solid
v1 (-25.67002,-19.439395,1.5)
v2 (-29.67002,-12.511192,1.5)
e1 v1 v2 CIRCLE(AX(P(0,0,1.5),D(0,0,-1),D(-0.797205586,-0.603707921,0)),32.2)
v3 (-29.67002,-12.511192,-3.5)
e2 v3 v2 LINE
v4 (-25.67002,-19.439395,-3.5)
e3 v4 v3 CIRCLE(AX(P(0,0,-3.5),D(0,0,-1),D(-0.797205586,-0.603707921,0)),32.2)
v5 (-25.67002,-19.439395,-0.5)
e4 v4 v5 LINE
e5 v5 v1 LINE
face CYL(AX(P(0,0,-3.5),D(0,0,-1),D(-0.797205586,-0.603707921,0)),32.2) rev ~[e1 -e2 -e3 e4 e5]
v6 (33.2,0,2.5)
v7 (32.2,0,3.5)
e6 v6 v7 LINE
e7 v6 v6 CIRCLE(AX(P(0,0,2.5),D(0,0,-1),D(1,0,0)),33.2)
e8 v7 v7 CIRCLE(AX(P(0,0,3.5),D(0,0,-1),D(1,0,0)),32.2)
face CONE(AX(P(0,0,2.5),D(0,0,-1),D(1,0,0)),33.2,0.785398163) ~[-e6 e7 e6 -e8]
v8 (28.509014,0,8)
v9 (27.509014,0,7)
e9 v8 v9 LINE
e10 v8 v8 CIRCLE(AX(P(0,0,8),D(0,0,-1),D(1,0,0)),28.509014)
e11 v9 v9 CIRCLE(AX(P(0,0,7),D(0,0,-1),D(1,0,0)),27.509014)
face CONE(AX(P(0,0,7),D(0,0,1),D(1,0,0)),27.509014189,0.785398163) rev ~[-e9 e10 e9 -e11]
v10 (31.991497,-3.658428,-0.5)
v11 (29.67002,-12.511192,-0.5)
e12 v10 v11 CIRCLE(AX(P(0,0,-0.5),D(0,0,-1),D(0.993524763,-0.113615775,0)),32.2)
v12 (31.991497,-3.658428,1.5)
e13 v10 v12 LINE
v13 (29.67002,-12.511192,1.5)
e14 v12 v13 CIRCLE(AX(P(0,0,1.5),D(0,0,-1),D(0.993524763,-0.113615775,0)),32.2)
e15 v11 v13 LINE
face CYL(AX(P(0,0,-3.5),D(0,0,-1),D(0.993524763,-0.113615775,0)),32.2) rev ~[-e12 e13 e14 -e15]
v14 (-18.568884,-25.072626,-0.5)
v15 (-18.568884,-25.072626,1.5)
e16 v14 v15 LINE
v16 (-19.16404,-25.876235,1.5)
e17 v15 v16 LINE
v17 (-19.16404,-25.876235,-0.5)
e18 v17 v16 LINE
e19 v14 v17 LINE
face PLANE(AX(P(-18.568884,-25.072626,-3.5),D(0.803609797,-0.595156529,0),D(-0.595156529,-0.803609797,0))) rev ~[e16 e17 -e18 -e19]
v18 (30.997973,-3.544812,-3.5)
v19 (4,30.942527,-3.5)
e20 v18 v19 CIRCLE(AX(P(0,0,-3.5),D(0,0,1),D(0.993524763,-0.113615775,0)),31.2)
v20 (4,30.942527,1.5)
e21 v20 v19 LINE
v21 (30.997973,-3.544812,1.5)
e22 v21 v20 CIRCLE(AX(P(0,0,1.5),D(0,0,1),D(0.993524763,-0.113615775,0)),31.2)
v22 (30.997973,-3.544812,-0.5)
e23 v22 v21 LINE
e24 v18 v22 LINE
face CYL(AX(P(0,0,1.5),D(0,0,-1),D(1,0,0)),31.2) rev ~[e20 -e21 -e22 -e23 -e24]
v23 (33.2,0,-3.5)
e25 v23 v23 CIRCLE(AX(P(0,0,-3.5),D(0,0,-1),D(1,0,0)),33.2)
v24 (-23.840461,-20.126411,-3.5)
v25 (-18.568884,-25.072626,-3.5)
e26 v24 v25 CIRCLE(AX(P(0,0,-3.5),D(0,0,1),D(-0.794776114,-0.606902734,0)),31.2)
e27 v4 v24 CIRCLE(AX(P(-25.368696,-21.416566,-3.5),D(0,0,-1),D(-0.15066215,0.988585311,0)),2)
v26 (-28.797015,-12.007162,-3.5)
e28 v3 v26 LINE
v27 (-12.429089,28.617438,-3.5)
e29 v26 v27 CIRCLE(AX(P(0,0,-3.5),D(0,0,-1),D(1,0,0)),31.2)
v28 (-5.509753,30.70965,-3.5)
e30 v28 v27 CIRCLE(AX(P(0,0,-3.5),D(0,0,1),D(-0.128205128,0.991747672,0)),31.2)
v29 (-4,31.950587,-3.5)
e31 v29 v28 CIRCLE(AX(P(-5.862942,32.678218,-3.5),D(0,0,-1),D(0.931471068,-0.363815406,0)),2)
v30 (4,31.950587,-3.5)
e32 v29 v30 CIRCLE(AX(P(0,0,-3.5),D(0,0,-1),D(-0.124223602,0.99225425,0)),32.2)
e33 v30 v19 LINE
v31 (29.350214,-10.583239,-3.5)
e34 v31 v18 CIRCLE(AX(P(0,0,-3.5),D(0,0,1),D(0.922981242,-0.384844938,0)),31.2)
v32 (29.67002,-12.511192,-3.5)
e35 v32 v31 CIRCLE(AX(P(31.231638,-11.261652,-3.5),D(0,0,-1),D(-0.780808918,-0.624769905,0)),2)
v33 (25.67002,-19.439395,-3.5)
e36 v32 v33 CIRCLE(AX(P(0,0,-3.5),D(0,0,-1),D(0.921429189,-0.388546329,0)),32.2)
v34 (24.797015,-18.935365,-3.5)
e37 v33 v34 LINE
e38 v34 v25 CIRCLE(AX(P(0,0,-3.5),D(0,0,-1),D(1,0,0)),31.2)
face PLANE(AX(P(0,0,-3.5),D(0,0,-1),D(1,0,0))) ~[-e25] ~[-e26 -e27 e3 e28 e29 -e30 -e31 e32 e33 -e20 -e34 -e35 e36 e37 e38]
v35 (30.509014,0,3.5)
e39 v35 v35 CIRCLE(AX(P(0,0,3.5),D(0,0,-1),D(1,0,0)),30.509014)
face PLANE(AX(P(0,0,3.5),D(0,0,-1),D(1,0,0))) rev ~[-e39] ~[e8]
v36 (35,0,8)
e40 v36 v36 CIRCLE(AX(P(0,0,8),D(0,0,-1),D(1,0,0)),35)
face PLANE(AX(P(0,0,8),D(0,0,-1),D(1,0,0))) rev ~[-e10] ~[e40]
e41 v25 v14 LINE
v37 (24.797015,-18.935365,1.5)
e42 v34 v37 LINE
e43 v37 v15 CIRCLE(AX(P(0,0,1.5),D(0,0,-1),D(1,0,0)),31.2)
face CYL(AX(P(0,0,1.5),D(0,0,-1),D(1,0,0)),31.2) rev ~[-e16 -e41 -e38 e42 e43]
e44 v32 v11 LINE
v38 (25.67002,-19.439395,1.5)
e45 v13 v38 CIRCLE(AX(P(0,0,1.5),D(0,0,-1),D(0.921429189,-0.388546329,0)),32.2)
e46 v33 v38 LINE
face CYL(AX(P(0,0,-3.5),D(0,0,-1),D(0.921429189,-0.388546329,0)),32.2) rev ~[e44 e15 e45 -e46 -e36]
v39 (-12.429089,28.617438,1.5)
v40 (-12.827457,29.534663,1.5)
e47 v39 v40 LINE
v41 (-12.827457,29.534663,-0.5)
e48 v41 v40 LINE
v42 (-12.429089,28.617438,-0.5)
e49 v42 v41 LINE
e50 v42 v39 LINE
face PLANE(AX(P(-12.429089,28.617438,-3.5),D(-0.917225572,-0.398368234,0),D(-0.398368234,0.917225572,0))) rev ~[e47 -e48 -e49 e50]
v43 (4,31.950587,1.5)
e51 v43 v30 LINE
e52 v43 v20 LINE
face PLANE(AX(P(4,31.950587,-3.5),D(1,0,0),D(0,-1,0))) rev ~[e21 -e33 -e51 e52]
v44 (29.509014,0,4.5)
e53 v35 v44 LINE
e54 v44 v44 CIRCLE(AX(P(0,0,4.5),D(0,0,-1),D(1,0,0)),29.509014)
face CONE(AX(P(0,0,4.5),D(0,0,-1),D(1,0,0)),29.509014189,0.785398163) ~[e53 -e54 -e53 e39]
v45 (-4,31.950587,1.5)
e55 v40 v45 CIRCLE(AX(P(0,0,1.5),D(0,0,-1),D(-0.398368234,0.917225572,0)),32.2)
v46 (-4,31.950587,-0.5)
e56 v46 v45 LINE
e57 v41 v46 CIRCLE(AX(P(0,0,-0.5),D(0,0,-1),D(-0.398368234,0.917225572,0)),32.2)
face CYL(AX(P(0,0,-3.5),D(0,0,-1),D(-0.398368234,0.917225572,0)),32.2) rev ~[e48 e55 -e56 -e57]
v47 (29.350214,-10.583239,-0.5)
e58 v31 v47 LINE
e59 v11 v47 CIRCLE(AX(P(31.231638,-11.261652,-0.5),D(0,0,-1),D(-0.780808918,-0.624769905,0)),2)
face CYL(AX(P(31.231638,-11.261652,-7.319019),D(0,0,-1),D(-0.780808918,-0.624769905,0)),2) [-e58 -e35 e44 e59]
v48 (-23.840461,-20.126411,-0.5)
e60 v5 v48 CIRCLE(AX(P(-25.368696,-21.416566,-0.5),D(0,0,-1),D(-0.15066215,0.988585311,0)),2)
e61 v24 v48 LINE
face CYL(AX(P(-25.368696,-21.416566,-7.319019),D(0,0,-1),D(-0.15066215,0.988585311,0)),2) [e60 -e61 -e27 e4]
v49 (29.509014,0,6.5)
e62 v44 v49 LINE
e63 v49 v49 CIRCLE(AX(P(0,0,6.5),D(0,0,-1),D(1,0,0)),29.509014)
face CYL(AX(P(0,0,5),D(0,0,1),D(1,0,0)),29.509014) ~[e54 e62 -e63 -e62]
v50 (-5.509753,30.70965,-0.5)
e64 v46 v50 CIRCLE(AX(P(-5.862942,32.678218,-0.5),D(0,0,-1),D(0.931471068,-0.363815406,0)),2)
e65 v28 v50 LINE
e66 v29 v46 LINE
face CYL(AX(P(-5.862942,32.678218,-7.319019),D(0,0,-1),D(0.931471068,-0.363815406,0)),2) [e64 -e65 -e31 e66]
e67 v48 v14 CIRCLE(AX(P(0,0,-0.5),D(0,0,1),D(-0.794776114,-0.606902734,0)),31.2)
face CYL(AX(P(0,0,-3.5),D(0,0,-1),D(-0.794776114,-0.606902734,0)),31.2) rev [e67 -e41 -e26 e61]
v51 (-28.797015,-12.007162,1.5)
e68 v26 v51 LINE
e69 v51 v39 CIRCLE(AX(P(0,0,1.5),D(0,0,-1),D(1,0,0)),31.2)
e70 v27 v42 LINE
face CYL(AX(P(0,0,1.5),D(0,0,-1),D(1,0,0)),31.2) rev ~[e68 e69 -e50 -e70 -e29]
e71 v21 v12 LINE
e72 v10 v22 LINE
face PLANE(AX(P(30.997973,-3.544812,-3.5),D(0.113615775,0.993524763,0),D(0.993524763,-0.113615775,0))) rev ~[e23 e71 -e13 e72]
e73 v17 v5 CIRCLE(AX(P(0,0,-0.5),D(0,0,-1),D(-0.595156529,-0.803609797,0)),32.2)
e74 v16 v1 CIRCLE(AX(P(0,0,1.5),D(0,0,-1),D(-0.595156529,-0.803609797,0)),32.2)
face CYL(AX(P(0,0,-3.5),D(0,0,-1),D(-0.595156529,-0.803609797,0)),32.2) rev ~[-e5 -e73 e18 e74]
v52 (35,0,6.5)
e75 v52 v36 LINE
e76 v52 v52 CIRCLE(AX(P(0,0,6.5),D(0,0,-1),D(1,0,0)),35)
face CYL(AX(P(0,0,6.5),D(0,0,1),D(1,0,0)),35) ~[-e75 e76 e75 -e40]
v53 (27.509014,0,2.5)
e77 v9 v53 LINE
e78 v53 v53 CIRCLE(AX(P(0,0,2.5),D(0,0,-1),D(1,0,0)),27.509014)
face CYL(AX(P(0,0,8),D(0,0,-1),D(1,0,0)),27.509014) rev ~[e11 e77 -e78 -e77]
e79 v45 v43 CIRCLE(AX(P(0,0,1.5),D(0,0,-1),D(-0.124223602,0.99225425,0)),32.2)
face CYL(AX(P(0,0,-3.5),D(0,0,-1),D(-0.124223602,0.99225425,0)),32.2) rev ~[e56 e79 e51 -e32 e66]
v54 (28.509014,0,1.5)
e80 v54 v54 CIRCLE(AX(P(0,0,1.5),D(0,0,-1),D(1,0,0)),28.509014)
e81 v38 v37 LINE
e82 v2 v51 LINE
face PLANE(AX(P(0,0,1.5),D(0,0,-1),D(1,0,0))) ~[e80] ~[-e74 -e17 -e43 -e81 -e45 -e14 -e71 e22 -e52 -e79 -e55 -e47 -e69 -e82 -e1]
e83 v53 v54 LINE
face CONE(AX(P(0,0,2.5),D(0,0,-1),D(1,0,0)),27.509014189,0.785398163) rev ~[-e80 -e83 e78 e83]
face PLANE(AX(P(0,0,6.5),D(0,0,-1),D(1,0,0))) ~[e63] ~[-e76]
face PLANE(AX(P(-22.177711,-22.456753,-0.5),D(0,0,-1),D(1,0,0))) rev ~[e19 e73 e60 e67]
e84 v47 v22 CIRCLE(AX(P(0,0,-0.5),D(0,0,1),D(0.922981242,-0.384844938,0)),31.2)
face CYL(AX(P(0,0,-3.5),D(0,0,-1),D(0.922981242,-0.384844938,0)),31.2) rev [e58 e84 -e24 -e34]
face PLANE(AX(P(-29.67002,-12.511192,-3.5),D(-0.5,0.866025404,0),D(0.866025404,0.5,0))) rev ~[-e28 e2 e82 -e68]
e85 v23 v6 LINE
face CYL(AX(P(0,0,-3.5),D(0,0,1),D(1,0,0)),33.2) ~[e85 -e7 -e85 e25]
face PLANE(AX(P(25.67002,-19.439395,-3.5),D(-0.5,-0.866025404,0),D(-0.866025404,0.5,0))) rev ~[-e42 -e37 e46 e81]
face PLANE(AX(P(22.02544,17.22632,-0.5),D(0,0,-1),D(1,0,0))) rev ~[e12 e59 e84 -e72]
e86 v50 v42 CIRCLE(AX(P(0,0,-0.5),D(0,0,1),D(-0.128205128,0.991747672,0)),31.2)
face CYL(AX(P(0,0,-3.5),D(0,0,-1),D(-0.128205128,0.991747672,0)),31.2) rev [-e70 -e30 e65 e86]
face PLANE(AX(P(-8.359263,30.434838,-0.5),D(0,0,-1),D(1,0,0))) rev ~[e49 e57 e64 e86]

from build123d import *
from build123d import SkipClean  # not in build123d's __all__

# Parameters (mm, degrees)
F0_W        = 2
F0_H        = 2
F0_H_2      = 3
F2_SIZE     = 1
F4_DEPTH    = 5
F5_DEPTH    = 3
F6_T4_DEPTH = 10.6380386618
F6_T6_DEPTH = 6.8190193309
F6_T8_DEPTH = 6.8190193309


# Not quite as in the source:
# - a fillet or chamfer that OpenCascade refuses, or shapes differently, is made with other operations: its cross-section is extruded or revolved along the edge and cut away or added


with BuildPart() as f1:
    # F0 (on Front) → F1 (revolve)
    with BuildSketch(Plane.XZ):
        Polygon((33.2, -3.5), (33.2, 3.5), (29.5090141887, 3.5), (29.5090141887, 1.5), (31.2, 1.5), (31.2, -3.5), align=None)
        with Locations((28.5090141887, 2.5)):
            Rectangle(F0_W, F0_H)
        with Locations((28.5090141887, 5)):
            Rectangle(F0_W, F0_H_2)
        Polygon((27.5090141887, 6.5), (29.5090141887, 6.5), (35, 6.5), (35, 8), (27.5090141887, 8), align=None)
    revolve(axis=Axis((0, 0, 0.081283506), (0, 0, -1)))

    # F2
    f2_edges = [f1.edges().sort_by_distance(p)[0] for p in [
        (-33.2, 0, 3.5),
        (-27.509014, 0, 1.5),
        (-29.509014, 0, 3.5),
        (-27.509014, 0, 8),
    ]]
    chamfer(f2_edges, length=F2_SIZE)

    # F3 (on face) → F4 (cut, through all)
    with BuildSketch(Plane(origin=(0, 0, -3.5), x_dir=(1, 0, 0), z_dir=(0, 0, -1))):
        with BuildLine():
            ThreePointArc((-4, -31.9505868491), (0, -32.2), (4, -31.9505868491))
            Line((4, -31.9505868491), (4, -30.9425273693))
            ThreePointArc((4, -30.9425273693), (0, -31.2), (-4, -30.9425273693))
            Line((-4, -30.9425273693), (-4, -31.9505868491))
        make_face()
        with BuildLine():
            ThreePointArc((-12.8274571452, -29.5346634176), (-8.5, -31.0578492494), (-4, -31.9505868491))
            Line((-4, -31.9505868491), (-4, -30.9425273693))
            ThreePointArc((-4, -30.9425273693), (-8.2963998779, -30.0767310236), (-12.4290889109, -28.6174378456))
            Line((-12.4290889109, -28.6174378456), (-12.8274571452, -29.5346634176))
        make_face()
        with BuildLine():
            ThreePointArc((-25.6700198771, 19.4393950397), (-27.8860180019, 16.1), (-29.6700198771, 12.5111918094))
            Line((-29.6700198771, 12.5111918094), (-28.7970147591, 12.0071620695))
            ThreePointArc((-28.7970147591, 12.0071620695), (-27.0199925981, 15.6), (-24.7970147591, 18.9353652998))
            Line((-24.7970147591, 18.9353652998), (-25.6700198771, 19.4393950397))
        make_face()
        with BuildLine():
            Line((-18.5688837101, 25.0726256655), (-19.1640402392, 25.8762354625))
            ThreePointArc((-19.1640402392, 25.8762354625), (-22.6468864369, 22.8901405569), (-25.6700198771, 19.4393950397))
            Line((-25.6700198771, 19.4393950397), (-24.7970147591, 18.9353652998))
            ThreePointArc((-24.7970147591, 18.9353652998), (-21.8990131903, 22.223258566), (-18.5688837101, 25.0726256655))
        make_face()
        with BuildLine():
            Line((30.9979726209, 3.5448121801), (31.9914973844, 3.6584279551))
            ThreePointArc((31.9914973844, 3.6584279551), (31.1468864369, 8.1677086925), (29.6700198771, 12.5111918094))
            Line((29.6700198771, 12.5111918094), (28.7970147591, 12.0071620695))
            ThreePointArc((28.7970147591, 12.0071620695), (30.1954130682, 7.8534724576), (30.9979726209, 3.5448121801))
        make_face()
        with BuildLine():
            Line((28.7970147591, 12.0071620695), (29.6700198771, 12.5111918094))
            ThreePointArc((29.6700198771, 12.5111918094), (27.8860180019, 16.1), (25.6700198771, 19.4393950397))
            Line((25.6700198771, 19.4393950397), (24.7970147591, 18.9353652998))
            ThreePointArc((24.7970147591, 18.9353652998), (27.0199925981, 15.6), (28.7970147591, 12.0071620695))
        make_face()
    extrude(amount=-F4_DEPTH, mode=Mode.SUBTRACT)

    # F3 (on face) → F5 (join)
    with BuildSketch(Plane(origin=(0, 0, -3.5), x_dir=(1, 0, 0), z_dir=(0, 0, -1))):
        with BuildLine():
            ThreePointArc((4, -31.9505868491), (24.1416652284, -21.3077450707), (32.2, 0))
            ThreePointArc((32.2, 0), (32.1478320869, 1.8321823356), (31.9914973844, 3.6584279551))
            Line((31.9914973844, 3.6584279551), (30.9979726209, 3.5448121801))
            ThreePointArc((30.9979726209, 3.5448121801), (31.1494522084, 1.775282263), (31.2, 0))
            ThreePointArc((31.2, 0), (23.4333096254, -20.5990291033), (4, -30.9425273693))
            Line((4, -30.9425273693), (4, -31.9505868491))
        make_face()
        with BuildLine():
            Line((30.9979726209, 3.5448121801), (31.9914973844, 3.6584279551))
            ThreePointArc((31.9914973844, 3.6584279551), (31.1468864369, 8.1677086925), (29.6700198771, 12.5111918094))
            Line((29.6700198771, 12.5111918094), (28.7970147591, 12.0071620695))
            ThreePointArc((28.7970147591, 12.0071620695), (30.1954130682, 7.8534724576), (30.9979726209, 3.5448121801))
        make_face()
        with BuildLine():
            ThreePointArc((-12.8274571452, -29.5346634176), (-8.5, -31.0578492494), (-4, -31.9505868491))
            Line((-4, -31.9505868491), (-4, -30.9425273693))
            ThreePointArc((-4, -30.9425273693), (-8.2963998779, -30.0767310236), (-12.4290889109, -28.6174378456))
            Line((-12.4290889109, -28.6174378456), (-12.8274571452, -29.5346634176))
        make_face()
        with BuildLine():
            Line((-18.5688837101, 25.0726256655), (-19.1640402392, 25.8762354625))
            ThreePointArc((-19.1640402392, 25.8762354625), (-22.6468864369, 22.8901405569), (-25.6700198771, 19.4393950397))
            Line((-25.6700198771, 19.4393950397), (-24.7970147591, 18.9353652998))
            ThreePointArc((-24.7970147591, 18.9353652998), (-21.8990131903, 22.223258566), (-18.5688837101, 25.0726256655))
        make_face()
    with SkipClean():  # cleaning this boolean's faces spoils the solid; the shape is the same uncleaned
        extrude(amount=-F5_DEPTH)

    # F6: fillet of radius 2 on 3 edges, made by hand


with BuildPart() as f6_tool2:
    # F6_s3 → F6_t4 (new body)
    with BuildSketch(Plane.XY.offset(-7.3190193309)):
        with BuildLine():
            ThreePointArc((-4, 31.9505868491), (-4.5929852552, 31.1331579467), (-5.5097528505, 30.7096503322))
            ThreePointArc((-5.5097528505, 30.7096503322), (-4.7563018983, 30.8353302601), (-4, 30.9425273693))
            Line((-4, 30.9425273693), (-4, 31.9505868491))
        make_face()
    extrude(amount=F6_T4_DEPTH)

    split(bisect_by=Plane.XY.offset(1.5), keep=Keep.BOTTOM)


with BuildPart() as f1_1:
    add(f1.part, clean=False)

    # F6_t1: cut F6_tool2
    add(f6_tool2.part, mode=Mode.SUBTRACT)

    # F6_s7 → F6_t6 (cut)
    with BuildSketch(Plane.XY.offset(-7.3190193309)):
        with BuildLine():
            ThreePointArc((-25.6700198771, -19.4393950397), (-24.6656130543, -19.5442208835), (-23.8404609038, -20.1264111032))
            ThreePointArc((-23.8404609038, -20.1264111032), (-24.3260283902, -19.5367434021), (-24.7970147591, -18.9353652998))
            Line((-24.7970147591, -18.9353652998), (-25.6700198771, -19.4393950397))
        make_face()
    extrude(amount=F6_T6_DEPTH, mode=Mode.SUBTRACT)

    # F6_s9 → F6_t8 (cut)
    with BuildSketch(Plane.XY.offset(-7.3190193309)):
        with BuildLine():
            ThreePointArc((29.6700198771, -12.5111918094), (29.2585983094, -11.5889370631), (29.3502137543, -10.583239229))
            ThreePointArc((29.3502137543, -10.583239229), (29.0823302885, -11.2985868581), (28.7970147591, -12.0071620695))
            Line((28.7970147591, -12.0071620695), (29.6700198771, -12.5111918094))
        make_face()
    extrude(amount=F6_T8_DEPTH, mode=Mode.SUBTRACT)


solid = f1_1.part
